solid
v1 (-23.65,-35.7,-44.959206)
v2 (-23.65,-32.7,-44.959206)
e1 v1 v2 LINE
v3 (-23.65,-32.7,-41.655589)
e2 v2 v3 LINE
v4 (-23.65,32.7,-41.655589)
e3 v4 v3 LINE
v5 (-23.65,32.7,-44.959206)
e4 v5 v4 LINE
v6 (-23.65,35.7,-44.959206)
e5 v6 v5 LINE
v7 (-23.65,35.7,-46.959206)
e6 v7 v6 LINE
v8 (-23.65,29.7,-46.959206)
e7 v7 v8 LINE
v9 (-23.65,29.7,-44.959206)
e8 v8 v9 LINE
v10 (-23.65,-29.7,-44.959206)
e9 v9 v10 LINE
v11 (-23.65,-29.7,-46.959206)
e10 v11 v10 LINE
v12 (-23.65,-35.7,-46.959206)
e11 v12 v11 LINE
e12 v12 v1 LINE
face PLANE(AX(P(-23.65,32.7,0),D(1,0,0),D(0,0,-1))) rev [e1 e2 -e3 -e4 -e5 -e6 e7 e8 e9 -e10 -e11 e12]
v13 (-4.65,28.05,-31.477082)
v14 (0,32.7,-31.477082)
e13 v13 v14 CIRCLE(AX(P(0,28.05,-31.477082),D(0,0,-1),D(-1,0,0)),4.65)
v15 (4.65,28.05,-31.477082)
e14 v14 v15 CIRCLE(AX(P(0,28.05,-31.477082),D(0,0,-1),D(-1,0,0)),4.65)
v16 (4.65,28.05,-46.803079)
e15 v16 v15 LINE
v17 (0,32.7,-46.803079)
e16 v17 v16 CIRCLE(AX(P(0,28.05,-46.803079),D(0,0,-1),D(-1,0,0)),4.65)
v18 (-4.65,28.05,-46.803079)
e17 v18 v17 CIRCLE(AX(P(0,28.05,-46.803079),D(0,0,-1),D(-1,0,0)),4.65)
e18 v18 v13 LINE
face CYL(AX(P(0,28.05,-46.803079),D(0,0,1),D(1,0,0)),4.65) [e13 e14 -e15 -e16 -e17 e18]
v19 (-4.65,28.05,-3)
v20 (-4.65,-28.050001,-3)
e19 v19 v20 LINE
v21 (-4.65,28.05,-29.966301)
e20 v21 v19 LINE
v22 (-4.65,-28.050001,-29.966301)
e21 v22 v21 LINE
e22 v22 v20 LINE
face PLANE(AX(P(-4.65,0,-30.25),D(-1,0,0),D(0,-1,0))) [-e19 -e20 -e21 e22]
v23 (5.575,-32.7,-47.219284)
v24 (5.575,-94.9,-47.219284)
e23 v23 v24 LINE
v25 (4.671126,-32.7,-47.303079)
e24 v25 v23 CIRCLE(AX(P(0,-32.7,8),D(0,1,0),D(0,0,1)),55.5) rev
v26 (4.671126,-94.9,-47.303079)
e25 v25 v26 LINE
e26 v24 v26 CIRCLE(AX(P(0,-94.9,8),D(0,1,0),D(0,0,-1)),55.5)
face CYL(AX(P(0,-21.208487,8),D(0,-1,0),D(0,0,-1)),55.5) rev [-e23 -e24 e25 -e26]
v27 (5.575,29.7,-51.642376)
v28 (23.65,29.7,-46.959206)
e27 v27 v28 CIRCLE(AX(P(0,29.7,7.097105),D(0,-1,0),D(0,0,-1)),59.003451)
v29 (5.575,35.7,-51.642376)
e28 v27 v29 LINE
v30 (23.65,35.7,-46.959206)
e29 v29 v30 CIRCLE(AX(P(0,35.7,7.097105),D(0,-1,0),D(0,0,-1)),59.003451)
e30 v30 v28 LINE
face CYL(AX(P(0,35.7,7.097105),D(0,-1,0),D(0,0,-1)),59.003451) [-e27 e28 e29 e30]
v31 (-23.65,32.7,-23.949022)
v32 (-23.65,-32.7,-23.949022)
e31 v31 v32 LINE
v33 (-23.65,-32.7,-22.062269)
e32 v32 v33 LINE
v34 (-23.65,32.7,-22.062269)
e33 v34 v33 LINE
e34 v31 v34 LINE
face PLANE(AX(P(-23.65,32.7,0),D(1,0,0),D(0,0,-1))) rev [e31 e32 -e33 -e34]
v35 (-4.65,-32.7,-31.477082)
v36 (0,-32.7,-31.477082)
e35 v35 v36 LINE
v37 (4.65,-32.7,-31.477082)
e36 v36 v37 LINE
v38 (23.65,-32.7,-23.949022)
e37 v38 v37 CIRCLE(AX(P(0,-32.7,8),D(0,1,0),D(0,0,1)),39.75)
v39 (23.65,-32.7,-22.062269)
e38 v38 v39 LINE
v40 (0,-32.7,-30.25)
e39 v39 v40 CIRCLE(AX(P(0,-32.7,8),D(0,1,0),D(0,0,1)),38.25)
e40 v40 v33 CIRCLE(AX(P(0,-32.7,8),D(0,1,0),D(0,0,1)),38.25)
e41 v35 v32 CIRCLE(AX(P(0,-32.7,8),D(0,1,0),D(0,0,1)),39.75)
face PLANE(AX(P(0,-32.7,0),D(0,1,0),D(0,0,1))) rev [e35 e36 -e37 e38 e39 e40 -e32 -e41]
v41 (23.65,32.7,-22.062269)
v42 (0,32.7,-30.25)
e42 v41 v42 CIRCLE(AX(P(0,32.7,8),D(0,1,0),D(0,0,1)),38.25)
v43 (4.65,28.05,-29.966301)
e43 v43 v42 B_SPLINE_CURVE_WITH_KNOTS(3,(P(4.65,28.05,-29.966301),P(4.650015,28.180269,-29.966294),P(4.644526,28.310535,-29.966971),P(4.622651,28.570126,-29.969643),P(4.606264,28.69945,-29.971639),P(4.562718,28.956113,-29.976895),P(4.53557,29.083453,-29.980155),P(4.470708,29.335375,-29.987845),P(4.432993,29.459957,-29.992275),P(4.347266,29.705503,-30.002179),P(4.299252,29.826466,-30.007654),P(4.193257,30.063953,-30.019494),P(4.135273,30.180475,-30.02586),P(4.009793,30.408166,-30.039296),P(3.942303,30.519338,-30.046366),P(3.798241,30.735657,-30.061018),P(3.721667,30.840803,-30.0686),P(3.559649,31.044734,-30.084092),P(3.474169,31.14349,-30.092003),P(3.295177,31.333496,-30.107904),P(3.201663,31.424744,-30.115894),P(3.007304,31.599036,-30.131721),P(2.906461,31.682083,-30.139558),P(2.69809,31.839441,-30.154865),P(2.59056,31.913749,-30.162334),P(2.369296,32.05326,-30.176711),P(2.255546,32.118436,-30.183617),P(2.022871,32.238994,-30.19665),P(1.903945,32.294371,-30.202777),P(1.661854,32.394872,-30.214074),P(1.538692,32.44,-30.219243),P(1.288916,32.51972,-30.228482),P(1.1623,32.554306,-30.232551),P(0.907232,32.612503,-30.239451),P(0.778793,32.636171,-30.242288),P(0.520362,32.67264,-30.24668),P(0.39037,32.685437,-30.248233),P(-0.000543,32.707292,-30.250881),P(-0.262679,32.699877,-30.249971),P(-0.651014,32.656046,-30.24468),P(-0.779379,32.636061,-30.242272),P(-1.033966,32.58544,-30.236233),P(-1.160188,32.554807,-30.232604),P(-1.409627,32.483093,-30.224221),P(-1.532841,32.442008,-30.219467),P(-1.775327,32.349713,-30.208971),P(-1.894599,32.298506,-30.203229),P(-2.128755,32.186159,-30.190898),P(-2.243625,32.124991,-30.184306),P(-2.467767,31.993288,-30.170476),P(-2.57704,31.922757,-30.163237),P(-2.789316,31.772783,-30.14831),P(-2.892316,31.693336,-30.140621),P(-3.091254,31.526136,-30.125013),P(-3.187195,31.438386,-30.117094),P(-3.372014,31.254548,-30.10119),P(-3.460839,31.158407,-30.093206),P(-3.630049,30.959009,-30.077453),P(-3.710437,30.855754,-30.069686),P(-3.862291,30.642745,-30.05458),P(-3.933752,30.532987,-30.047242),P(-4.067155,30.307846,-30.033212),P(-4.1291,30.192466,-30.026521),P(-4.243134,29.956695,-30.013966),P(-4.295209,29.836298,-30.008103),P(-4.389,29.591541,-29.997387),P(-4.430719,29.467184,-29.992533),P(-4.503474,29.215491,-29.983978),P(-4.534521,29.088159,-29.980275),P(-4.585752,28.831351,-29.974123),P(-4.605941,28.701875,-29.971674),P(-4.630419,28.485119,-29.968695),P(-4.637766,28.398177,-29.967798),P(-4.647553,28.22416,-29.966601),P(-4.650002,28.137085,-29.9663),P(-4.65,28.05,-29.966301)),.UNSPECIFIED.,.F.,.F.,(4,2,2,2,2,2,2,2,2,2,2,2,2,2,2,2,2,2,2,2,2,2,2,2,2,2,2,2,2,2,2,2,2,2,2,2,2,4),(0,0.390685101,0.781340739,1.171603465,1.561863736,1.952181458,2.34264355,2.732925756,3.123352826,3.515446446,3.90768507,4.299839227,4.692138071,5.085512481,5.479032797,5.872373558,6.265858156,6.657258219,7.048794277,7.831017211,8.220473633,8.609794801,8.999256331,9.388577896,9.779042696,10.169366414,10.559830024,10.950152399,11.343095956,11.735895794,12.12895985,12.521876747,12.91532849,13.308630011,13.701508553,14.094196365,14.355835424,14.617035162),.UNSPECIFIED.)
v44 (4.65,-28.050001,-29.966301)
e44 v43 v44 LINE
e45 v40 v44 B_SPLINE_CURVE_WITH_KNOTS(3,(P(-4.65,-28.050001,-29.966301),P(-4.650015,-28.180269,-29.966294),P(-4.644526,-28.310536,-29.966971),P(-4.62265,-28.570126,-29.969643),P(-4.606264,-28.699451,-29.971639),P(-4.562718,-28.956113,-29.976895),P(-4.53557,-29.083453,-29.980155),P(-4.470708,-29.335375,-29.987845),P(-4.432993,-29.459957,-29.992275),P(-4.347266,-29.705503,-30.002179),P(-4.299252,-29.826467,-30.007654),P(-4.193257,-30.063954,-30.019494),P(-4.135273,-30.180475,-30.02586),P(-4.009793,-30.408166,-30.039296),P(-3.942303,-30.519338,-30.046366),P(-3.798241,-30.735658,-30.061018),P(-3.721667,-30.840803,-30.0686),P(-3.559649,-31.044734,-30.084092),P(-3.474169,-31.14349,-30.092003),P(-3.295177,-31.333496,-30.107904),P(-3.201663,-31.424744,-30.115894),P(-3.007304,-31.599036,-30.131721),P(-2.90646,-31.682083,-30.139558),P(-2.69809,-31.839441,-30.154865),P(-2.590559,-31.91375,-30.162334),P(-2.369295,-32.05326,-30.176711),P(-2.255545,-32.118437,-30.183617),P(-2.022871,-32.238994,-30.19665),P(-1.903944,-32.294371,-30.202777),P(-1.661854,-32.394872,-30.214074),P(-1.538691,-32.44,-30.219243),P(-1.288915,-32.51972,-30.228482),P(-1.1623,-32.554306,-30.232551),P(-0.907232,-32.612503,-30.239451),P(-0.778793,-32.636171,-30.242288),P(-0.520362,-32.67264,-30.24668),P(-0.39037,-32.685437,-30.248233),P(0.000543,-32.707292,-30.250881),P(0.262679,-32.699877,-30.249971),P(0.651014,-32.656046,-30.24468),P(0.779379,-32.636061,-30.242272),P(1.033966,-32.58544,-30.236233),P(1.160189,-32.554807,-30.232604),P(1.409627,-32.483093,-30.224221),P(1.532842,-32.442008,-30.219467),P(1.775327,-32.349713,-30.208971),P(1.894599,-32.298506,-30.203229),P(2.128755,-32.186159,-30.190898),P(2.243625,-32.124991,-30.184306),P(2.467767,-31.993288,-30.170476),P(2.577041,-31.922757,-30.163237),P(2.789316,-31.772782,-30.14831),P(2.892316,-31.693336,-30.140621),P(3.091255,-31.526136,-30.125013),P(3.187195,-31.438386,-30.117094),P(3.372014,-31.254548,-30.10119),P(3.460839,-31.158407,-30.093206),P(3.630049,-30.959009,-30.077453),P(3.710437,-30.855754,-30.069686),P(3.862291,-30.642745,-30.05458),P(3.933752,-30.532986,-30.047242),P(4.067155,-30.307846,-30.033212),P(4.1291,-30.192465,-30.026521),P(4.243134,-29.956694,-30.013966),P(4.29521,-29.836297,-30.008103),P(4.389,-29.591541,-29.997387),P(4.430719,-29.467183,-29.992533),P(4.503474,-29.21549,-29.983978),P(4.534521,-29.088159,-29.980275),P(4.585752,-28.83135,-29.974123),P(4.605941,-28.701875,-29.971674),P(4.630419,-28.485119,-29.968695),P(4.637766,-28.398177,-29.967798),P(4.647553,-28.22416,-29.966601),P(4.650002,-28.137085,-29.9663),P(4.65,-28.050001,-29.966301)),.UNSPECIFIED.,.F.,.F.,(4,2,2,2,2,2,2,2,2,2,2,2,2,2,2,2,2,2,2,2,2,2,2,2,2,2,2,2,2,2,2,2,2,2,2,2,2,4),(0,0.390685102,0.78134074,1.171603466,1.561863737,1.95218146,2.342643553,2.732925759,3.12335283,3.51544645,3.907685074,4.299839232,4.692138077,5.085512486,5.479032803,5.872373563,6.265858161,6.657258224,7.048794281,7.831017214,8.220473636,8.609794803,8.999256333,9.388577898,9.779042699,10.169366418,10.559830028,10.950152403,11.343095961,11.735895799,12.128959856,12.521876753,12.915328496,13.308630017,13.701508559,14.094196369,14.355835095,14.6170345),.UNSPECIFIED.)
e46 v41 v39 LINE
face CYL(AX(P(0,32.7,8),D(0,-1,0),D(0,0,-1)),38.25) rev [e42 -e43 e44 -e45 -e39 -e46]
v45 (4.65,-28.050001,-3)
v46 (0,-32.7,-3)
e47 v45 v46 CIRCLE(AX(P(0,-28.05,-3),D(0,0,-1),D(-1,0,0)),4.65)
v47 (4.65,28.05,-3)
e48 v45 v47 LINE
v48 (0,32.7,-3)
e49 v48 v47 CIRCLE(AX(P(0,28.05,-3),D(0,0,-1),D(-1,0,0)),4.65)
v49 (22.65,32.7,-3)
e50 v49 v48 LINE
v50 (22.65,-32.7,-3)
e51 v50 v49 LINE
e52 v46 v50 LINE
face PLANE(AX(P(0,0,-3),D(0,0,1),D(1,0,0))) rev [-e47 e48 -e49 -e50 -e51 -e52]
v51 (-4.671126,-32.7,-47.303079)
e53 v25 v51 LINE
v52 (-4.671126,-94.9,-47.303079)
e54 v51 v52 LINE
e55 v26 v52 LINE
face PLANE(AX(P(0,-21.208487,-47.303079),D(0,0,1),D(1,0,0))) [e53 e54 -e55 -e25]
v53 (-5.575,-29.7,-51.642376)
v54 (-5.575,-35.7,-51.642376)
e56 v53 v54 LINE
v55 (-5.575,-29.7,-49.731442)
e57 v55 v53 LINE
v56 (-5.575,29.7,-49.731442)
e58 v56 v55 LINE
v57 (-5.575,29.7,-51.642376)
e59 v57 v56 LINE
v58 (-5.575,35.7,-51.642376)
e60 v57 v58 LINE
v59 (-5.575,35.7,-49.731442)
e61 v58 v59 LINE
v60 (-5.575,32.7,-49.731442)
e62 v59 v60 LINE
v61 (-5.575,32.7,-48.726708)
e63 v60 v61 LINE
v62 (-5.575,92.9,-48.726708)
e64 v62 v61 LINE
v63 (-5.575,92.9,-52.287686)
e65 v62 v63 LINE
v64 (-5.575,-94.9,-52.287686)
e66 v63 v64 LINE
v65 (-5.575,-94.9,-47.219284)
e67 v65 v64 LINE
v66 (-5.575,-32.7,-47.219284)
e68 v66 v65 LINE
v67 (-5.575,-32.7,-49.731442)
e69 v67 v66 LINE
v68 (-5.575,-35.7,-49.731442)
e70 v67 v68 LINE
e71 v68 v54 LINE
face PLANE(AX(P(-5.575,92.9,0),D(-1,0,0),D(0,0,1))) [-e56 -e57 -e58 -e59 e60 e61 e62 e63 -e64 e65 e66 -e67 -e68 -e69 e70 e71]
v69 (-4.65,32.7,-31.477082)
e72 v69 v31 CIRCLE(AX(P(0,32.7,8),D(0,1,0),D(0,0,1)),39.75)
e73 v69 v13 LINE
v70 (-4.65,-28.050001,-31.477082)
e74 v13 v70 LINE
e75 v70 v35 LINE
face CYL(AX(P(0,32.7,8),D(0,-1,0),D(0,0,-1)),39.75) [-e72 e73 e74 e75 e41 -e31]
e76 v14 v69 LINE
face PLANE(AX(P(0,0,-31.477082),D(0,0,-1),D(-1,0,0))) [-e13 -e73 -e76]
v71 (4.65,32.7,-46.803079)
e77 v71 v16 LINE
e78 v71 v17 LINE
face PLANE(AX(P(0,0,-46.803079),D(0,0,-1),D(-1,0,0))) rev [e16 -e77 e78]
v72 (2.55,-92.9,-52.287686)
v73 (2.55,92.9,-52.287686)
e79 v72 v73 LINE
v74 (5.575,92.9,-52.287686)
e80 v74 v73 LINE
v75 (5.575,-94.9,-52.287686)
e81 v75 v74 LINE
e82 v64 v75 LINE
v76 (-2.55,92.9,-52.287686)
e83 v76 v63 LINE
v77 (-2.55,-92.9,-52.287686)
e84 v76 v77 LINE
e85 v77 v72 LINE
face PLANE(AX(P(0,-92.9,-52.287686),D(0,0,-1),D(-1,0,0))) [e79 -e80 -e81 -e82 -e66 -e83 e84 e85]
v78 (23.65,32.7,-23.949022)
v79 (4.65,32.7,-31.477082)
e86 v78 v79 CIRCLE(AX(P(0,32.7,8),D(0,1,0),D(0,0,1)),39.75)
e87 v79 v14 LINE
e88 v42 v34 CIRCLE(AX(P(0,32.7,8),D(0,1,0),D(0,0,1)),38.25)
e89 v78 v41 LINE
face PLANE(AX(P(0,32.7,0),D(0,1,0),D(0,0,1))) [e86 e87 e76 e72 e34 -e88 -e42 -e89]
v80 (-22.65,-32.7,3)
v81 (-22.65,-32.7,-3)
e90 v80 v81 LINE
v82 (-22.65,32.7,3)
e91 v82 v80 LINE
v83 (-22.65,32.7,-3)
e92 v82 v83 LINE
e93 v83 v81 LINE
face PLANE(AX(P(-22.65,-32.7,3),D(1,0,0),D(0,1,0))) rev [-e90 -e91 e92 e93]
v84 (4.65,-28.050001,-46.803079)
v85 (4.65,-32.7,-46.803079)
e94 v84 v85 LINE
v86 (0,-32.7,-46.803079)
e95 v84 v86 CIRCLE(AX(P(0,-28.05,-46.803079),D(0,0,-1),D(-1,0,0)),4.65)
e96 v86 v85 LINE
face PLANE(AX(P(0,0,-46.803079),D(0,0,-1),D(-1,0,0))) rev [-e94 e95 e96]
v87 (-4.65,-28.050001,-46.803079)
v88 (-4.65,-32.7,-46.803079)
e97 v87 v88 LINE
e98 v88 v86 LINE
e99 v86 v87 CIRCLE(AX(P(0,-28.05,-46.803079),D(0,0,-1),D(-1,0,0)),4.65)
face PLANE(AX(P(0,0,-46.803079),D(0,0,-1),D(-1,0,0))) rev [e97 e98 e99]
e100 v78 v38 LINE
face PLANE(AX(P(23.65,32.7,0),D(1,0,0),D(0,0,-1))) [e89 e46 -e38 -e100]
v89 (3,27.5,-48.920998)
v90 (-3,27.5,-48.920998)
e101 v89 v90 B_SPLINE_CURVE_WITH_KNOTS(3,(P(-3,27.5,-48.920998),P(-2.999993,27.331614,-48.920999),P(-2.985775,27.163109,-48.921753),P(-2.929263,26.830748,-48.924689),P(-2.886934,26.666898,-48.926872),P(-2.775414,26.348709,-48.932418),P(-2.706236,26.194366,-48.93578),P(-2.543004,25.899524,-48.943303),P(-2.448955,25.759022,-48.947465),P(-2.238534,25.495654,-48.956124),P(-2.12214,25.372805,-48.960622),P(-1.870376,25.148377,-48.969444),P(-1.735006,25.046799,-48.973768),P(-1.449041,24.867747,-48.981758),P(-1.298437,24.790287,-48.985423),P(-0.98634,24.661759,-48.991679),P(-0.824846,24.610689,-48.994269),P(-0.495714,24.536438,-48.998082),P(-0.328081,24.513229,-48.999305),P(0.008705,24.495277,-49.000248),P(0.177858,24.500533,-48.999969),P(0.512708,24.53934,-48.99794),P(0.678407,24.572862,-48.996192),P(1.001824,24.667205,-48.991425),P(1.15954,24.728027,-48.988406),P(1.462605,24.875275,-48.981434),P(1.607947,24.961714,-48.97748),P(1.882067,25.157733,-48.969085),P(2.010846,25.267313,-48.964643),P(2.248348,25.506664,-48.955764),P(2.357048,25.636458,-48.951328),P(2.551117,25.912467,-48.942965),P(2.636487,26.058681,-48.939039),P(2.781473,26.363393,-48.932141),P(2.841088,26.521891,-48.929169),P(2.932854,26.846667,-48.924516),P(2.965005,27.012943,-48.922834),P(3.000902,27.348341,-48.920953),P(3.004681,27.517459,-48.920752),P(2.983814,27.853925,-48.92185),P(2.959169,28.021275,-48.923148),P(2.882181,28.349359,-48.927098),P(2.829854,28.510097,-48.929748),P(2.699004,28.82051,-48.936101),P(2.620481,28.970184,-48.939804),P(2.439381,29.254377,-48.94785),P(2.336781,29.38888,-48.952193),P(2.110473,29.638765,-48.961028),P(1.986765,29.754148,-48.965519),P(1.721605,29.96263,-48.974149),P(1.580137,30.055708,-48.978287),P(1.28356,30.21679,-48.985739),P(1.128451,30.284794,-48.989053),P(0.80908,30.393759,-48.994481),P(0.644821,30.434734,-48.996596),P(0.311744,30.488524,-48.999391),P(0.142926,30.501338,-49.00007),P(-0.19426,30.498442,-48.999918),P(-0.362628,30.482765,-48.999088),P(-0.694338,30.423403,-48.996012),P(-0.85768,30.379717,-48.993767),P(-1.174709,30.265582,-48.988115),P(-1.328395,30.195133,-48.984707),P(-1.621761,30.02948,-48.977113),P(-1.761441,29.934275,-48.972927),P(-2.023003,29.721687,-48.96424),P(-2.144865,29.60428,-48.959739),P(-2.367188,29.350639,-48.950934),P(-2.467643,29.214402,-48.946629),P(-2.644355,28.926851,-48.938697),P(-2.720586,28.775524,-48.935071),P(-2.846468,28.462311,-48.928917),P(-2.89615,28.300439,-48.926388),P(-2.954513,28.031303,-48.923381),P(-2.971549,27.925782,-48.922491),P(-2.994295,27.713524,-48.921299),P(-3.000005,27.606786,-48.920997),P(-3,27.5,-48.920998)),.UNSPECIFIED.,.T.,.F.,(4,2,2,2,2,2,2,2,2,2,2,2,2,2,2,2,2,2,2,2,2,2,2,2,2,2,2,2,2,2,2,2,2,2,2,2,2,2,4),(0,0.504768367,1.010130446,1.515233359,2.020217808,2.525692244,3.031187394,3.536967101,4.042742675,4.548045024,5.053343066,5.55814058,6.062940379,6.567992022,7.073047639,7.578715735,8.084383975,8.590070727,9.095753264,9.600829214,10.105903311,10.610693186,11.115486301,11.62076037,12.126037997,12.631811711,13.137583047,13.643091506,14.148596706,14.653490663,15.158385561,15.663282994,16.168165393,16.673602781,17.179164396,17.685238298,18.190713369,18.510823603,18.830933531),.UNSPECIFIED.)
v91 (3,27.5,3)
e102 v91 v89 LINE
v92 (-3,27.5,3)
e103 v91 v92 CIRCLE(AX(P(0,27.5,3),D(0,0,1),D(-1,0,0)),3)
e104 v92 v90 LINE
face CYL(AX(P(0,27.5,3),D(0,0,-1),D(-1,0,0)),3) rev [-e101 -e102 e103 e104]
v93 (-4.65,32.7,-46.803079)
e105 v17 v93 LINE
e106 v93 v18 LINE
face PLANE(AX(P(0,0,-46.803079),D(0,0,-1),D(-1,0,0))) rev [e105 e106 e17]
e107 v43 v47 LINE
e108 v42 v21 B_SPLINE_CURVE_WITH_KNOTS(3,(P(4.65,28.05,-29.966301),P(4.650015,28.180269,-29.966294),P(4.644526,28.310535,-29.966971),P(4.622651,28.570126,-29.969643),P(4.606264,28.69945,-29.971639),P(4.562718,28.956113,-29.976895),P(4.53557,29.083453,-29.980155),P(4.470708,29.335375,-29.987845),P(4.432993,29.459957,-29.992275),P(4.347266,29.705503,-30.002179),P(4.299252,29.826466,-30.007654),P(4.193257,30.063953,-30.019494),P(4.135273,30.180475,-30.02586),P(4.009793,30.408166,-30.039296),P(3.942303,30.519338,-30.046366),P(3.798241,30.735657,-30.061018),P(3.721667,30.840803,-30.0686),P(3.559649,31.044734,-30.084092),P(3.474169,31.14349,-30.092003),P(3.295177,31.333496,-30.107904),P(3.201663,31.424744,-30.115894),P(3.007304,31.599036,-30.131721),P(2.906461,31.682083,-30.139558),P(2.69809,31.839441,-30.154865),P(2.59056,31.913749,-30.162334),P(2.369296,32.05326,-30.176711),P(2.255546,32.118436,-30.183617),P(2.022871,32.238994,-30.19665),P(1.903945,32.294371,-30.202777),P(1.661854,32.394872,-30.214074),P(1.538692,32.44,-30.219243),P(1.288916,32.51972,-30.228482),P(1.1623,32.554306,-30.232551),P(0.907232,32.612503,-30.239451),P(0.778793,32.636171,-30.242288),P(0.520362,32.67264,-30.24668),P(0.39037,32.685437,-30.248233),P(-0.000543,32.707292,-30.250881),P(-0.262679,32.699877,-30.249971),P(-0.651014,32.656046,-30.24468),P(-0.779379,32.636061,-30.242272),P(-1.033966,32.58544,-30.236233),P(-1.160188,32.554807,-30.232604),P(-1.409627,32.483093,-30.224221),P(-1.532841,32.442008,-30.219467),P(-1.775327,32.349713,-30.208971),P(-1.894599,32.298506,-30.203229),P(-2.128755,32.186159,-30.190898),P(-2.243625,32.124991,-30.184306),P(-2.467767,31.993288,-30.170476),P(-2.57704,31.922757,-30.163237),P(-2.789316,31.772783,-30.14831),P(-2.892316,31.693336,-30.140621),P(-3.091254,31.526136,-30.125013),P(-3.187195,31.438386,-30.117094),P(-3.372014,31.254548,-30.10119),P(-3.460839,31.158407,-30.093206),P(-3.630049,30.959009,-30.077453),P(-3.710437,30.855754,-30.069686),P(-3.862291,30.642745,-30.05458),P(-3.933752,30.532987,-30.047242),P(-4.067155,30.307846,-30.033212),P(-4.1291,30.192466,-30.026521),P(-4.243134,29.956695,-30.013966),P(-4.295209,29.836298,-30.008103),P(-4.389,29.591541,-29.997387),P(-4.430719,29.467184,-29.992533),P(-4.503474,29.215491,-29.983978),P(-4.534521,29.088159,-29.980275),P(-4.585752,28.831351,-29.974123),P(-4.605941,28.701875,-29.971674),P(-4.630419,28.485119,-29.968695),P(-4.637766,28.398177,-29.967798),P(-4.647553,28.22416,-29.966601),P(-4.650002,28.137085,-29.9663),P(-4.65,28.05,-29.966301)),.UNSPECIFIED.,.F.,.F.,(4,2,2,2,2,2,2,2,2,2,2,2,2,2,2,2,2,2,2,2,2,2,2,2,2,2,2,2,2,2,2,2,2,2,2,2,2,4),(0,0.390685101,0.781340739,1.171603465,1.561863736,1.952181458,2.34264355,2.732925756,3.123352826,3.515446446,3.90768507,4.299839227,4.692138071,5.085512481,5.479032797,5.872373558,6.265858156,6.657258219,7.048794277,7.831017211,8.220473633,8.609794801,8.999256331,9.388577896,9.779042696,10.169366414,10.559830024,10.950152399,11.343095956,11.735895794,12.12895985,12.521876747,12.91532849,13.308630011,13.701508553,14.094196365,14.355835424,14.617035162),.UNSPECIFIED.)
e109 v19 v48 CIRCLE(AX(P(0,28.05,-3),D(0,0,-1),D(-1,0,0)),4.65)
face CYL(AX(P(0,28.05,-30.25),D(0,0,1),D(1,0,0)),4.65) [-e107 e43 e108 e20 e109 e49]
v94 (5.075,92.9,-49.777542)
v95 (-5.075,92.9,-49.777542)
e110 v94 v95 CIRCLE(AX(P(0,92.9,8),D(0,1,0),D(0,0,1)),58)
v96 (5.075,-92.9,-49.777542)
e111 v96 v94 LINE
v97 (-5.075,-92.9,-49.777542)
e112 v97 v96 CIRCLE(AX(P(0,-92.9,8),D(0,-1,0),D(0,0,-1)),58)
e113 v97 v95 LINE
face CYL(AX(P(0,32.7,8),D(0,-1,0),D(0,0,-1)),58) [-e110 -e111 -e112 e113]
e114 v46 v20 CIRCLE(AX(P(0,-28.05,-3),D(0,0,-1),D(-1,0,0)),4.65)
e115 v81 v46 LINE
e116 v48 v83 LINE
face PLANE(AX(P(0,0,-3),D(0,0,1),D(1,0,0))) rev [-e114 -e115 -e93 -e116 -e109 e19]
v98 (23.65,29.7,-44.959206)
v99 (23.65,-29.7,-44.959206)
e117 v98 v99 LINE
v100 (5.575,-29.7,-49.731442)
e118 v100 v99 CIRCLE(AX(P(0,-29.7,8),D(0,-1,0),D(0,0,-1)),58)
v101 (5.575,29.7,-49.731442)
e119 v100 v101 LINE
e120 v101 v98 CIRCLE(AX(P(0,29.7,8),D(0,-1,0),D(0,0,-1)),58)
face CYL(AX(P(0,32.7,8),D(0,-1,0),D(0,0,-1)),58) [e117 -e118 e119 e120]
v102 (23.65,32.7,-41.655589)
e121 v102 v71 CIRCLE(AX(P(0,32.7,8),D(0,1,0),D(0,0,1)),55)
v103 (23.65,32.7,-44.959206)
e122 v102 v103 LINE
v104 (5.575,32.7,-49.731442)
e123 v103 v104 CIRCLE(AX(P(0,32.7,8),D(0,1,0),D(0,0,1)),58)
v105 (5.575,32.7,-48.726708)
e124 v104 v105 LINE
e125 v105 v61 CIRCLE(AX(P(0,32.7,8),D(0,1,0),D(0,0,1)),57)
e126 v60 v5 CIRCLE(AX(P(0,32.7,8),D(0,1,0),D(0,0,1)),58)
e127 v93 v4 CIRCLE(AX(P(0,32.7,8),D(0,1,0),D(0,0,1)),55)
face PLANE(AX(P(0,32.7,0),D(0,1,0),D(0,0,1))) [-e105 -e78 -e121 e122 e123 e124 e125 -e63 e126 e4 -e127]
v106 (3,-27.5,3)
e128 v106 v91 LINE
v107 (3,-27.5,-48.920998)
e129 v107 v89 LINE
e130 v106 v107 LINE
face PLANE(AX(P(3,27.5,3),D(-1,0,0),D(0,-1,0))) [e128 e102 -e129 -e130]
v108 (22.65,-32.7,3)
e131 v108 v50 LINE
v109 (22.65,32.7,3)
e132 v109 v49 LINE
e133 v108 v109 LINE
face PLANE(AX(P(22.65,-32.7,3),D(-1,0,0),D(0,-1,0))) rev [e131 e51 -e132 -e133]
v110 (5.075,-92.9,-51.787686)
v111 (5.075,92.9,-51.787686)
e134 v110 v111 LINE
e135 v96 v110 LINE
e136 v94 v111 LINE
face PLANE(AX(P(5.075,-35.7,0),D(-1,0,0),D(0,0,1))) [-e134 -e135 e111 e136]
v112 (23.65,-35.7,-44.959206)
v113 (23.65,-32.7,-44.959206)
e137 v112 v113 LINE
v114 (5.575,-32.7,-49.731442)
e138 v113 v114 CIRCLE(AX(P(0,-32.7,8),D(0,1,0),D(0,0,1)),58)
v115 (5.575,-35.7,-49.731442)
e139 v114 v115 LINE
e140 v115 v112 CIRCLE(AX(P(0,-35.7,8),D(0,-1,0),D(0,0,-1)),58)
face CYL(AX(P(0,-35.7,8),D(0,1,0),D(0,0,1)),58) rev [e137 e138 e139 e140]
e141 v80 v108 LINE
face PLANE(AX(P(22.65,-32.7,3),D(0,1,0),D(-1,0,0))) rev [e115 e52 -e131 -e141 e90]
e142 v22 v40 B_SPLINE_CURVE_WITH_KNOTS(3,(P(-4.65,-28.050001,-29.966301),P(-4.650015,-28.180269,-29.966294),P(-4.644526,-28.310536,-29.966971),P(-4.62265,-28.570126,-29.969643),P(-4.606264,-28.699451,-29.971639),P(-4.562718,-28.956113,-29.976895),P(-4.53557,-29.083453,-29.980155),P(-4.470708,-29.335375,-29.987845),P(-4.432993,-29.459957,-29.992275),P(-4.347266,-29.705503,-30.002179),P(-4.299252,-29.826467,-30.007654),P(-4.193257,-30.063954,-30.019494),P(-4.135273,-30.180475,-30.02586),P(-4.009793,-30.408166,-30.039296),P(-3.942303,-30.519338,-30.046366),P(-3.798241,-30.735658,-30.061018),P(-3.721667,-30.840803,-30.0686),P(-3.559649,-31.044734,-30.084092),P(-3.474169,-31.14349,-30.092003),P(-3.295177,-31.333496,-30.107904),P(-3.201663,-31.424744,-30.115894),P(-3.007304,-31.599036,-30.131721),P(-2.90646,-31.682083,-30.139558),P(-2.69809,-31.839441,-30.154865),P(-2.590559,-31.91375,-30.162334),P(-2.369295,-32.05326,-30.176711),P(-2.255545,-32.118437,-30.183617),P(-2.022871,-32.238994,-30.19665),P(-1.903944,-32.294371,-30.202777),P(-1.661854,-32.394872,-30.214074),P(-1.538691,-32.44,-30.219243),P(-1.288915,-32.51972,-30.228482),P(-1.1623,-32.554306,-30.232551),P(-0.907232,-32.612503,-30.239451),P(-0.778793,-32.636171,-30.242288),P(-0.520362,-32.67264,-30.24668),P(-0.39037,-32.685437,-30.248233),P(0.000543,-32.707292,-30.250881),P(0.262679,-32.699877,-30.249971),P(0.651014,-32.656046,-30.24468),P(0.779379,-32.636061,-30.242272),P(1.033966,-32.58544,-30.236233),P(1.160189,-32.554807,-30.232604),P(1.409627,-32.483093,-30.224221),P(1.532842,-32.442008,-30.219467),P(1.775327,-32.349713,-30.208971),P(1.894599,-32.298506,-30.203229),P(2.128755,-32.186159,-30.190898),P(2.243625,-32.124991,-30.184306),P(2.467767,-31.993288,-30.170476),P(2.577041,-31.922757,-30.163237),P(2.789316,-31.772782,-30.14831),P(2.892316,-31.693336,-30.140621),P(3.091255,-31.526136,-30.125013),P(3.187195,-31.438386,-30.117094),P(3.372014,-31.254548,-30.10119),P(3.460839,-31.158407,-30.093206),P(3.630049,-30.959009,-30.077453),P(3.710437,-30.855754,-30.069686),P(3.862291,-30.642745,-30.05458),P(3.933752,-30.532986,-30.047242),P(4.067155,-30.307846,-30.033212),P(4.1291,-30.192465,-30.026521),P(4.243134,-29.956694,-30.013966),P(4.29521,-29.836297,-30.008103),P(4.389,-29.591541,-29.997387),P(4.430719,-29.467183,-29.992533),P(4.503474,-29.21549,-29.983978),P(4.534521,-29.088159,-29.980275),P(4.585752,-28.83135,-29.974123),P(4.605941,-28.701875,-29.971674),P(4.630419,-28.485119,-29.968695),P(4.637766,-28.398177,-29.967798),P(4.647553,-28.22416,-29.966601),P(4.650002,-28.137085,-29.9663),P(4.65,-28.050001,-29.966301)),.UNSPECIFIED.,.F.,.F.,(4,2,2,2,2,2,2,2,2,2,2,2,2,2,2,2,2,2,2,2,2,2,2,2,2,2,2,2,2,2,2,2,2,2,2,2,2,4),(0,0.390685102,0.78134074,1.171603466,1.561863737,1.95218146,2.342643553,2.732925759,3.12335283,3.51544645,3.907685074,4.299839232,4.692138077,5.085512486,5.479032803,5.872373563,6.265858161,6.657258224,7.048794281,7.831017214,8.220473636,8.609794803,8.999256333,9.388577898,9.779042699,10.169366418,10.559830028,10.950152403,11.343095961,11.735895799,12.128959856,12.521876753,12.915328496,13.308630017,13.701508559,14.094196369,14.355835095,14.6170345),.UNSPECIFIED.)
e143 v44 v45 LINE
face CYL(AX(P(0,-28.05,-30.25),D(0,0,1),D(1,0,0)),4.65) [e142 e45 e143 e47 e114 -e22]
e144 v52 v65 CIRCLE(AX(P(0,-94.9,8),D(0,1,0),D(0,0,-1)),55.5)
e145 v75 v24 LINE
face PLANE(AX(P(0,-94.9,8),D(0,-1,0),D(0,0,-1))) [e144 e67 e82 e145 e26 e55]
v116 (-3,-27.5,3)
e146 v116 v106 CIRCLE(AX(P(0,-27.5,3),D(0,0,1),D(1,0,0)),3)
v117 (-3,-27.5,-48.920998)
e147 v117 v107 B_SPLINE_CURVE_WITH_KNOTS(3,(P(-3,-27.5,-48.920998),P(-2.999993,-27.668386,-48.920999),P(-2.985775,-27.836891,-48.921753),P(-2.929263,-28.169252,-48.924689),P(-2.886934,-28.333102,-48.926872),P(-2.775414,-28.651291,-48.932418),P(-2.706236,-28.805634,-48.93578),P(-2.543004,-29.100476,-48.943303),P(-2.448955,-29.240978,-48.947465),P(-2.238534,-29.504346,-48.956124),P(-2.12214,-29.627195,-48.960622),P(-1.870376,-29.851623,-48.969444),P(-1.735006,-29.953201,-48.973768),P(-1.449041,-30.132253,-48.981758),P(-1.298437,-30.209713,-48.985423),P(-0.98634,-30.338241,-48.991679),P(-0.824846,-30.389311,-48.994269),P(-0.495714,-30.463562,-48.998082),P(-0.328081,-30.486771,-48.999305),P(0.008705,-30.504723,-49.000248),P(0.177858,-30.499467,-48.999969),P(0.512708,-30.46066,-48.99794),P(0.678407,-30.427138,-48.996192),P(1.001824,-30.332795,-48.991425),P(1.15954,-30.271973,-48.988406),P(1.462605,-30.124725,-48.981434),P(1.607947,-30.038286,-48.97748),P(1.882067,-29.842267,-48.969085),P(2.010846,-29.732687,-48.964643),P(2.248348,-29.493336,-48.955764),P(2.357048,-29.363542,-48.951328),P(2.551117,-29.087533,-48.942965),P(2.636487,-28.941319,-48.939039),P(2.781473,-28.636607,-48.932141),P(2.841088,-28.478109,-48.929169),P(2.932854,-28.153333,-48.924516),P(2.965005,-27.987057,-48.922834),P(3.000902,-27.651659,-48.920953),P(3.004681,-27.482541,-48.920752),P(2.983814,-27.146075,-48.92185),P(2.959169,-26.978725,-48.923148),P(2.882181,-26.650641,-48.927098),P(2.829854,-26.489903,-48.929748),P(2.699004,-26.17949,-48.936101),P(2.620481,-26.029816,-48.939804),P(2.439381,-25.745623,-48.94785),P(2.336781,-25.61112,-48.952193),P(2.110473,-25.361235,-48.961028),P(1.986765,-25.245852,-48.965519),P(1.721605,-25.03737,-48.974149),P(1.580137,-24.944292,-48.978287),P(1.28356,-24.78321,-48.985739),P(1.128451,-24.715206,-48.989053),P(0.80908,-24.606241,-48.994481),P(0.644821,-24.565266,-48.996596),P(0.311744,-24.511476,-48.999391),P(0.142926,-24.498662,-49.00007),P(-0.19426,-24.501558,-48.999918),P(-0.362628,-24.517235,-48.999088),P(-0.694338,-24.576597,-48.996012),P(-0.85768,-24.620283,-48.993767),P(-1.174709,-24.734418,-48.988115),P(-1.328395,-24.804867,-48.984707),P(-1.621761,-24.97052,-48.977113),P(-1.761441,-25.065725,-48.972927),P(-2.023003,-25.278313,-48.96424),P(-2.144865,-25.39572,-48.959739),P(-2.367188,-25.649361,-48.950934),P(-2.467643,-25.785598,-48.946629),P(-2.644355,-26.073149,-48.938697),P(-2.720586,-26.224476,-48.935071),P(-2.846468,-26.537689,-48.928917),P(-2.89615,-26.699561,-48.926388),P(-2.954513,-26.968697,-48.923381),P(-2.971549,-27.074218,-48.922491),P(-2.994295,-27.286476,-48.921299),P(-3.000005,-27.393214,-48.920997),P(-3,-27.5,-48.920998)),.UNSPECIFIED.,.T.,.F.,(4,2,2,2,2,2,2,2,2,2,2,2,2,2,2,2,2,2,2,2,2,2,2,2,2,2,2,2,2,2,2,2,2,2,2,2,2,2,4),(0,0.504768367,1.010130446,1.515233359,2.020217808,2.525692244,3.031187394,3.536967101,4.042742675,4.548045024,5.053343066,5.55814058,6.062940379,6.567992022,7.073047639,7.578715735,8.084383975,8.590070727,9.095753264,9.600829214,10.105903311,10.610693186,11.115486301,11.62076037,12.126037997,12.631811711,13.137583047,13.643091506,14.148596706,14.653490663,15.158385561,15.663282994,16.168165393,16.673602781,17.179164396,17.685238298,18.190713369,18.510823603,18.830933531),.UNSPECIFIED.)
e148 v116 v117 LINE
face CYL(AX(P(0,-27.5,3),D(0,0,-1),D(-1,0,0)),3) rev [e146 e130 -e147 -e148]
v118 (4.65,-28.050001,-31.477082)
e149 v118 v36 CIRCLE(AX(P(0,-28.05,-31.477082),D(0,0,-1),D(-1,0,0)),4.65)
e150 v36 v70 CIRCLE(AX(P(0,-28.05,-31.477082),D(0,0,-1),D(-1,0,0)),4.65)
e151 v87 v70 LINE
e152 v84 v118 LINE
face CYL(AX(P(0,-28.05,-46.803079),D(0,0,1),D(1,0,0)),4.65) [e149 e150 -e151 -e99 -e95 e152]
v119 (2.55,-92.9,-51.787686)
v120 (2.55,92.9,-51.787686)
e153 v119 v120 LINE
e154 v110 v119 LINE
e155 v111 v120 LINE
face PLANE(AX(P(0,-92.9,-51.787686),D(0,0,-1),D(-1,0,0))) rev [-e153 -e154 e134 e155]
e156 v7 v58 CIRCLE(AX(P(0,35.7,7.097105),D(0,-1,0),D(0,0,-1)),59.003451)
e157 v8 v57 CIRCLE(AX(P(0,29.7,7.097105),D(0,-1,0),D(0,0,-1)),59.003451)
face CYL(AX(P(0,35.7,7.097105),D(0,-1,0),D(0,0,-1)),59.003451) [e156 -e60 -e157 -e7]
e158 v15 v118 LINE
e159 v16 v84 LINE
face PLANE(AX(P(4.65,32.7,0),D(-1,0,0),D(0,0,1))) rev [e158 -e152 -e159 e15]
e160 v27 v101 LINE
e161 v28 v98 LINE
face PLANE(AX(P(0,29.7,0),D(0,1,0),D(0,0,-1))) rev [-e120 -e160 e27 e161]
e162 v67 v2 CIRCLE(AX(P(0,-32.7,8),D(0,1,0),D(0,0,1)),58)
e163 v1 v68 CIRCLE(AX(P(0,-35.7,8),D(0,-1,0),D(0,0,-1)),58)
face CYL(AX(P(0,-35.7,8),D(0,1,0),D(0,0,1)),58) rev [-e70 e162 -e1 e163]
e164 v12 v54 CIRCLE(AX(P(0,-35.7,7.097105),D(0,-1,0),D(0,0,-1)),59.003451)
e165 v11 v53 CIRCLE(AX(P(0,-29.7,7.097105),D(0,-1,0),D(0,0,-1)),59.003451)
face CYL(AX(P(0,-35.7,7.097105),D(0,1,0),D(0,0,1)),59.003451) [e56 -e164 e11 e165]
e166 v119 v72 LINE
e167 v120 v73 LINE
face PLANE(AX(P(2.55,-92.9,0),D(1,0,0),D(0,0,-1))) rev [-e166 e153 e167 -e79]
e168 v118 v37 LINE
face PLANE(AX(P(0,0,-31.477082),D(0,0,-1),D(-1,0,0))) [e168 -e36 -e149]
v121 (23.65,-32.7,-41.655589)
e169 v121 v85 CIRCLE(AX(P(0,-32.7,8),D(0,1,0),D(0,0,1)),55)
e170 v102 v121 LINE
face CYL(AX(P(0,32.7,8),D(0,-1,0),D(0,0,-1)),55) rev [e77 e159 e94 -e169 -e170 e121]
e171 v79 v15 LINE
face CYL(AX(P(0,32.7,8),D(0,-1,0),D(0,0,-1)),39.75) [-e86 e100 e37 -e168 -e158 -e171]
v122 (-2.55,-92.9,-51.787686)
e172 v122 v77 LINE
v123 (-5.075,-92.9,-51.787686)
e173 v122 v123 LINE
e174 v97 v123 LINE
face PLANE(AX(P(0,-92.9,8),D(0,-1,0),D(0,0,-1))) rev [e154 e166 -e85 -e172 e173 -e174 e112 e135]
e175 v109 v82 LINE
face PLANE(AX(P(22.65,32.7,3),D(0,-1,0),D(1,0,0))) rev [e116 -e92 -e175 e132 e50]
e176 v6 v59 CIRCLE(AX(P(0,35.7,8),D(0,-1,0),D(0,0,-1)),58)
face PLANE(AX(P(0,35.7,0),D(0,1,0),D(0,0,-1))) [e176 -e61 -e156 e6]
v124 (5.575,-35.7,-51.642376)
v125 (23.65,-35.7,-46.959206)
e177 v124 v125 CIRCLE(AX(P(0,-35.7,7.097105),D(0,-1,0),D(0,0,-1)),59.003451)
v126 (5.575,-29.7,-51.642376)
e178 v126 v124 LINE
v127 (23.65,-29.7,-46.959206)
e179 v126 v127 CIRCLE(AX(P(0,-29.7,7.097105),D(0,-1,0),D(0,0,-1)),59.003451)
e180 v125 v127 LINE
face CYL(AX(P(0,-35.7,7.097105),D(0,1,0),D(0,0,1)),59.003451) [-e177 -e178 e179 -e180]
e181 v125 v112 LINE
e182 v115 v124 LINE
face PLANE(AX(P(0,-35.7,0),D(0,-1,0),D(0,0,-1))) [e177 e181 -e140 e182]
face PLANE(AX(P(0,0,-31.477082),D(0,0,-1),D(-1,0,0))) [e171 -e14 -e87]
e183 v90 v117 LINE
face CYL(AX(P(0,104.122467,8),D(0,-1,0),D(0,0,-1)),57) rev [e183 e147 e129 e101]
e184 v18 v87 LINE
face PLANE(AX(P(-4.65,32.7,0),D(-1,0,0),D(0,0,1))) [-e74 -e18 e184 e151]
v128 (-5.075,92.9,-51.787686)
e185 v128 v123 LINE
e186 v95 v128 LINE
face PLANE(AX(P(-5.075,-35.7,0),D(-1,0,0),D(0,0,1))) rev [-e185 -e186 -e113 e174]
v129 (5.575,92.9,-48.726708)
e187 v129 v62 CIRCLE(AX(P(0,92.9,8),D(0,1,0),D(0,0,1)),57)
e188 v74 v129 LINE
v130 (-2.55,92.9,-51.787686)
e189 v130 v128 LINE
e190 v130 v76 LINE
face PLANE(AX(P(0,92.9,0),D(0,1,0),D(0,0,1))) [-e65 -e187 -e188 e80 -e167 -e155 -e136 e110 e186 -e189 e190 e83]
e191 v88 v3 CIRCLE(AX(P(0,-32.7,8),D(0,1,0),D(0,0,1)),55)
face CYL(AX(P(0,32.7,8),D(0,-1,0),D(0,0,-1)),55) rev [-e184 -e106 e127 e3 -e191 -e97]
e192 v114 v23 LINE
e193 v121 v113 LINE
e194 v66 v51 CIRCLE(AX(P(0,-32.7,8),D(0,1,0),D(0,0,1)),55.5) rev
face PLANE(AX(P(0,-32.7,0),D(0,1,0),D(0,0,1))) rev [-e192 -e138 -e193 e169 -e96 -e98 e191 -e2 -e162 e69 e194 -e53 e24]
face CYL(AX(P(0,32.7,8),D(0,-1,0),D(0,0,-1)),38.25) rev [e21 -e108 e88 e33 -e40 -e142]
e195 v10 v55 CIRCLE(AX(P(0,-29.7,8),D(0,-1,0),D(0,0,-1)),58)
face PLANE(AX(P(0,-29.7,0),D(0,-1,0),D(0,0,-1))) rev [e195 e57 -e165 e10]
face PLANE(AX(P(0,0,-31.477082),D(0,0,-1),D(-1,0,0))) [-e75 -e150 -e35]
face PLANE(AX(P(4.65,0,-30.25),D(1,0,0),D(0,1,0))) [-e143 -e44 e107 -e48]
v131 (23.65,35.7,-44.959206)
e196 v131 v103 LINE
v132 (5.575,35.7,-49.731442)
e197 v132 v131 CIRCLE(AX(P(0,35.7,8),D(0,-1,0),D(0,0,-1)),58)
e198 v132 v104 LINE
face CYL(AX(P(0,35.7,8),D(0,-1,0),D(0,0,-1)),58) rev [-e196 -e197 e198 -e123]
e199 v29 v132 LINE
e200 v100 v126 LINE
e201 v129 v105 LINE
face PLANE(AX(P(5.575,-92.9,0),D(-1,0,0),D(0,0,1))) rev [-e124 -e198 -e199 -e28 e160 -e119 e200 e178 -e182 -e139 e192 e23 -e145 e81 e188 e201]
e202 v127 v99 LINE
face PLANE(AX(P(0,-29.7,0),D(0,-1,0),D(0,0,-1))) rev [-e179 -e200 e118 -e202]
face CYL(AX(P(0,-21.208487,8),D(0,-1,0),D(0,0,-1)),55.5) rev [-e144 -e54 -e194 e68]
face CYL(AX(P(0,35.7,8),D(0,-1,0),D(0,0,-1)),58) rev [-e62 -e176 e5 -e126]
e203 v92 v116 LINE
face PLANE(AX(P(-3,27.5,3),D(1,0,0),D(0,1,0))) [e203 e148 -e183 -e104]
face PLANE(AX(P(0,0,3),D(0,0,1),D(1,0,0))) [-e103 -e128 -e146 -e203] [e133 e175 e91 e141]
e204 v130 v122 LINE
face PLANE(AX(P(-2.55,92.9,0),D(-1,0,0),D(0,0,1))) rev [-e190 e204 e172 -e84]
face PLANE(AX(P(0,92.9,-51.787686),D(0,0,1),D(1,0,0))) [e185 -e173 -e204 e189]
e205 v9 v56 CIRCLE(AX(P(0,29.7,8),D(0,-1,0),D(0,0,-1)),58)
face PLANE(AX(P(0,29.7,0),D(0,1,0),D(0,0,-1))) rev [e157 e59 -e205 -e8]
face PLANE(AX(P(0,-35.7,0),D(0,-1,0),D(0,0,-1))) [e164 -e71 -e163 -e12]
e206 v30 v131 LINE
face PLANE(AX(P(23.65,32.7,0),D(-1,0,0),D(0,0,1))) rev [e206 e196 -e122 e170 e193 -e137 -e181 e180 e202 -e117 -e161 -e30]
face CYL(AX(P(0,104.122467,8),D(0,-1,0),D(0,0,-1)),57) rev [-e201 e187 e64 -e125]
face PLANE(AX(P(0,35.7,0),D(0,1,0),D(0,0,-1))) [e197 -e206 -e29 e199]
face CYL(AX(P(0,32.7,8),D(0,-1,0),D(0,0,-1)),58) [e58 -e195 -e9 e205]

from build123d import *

# Parameters (mm, degrees)
SKETCH1_W                = 45.3
SKETCH1_H                = 65.4
BOSS_EXTRUDE1_DEPTH      = 3
BOSS_EXTRUDE2_DEPTH      = 27.25
BOSS_EXTRUDE3_START      = -32.7
BOSS_EXTRUDE3_DEPTH      = 65.4
CUT_EXTRUDE1_DEPTH       = 65.254280101
CUT_EXTRUDE1_DEPTH_BACK  = 65.254280101
CUT_EXTRUDE3_DEPTH       = 15.325997
BOSS_EXTRUDE4_START      = 6
BOSS_EXTRUDE4_DEPTH      = 6
CUT_EXTRUDE4_DEPTH       = 92.386822264
BOSS_EXTRUDE5_DEPTH      = 92.9
BOSS_EXTRUDE5_DEPTH_BACK = 92.9
BOSS_EXTRUDE6_DEPTH      = 60.2
BOSS_EXTRUDE7_START      = 2
BOSS_EXTRUDE7_DEPTH      = 2
BOSS_EXTRUDE8_START      = -63.2
BOSS_EXTRUDE8_DEPTH      = 123.4


# Read off the part's stored shape, not the designer's step: Boss-Extrude3
with BuildPart() as part:
    # Sketch1 → Boss-Extrude1 (new, symmetric)
    with BuildSketch(Plane.XY):
        Rectangle(SKETCH1_W, SKETCH1_H)
        with BuildLine():
            Line((3, 27.5), (3, -27.5))
            ThreePointArc((3, -27.5), (0, -30.5), (-3, -27.5))
            Line((-3, -27.5), (-3, 27.5))
            ThreePointArc((-3, 27.5), (0, 30.5), (3, 27.5))
        make_face(mode=Mode.SUBTRACT)
    extrude(amount=BOSS_EXTRUDE1_DEPTH, both=True)

    # Sketch3 → Boss-Extrude2 (add)
    with BuildSketch(Plane(origin=(0, 0, -3), x_dir=(-1, 0, 0), z_dir=(0, 0, -1))):
        with BuildLine():
            Line((4.65, 28.050000345), (4.65, -28.050000676))
            ThreePointArc((4.65, -28.050000676), (0, -32.7), (-4.65, -28.050000677))
            Line((-4.65, -28.050000677), (-4.65, 28.050000345))
            ThreePointArc((-4.65, 28.050000345), (0, 32.7), (4.65, 28.050000345))
        make_face()
    extrude(amount=BOSS_EXTRUDE2_DEPTH)

    # Boss-Extrude3 outline → Boss-Extrude3 (add)
    with BuildSketch(Plane(origin=(0, 0, 0), x_dir=(1, 0, 0), z_dir=(0, 1, 0)).offset(BOSS_EXTRUDE3_START)):
        with BuildLine():
            Line((4.65, 31.477081959), (4.65, 46.803079293))
            ThreePointArc((4.65, 46.803079293), (14.382164808, 45.086281989), (23.65, 41.655588809))
            Line((23.65, 41.655588809), (23.65, 44.959205999))
            ThreePointArc((23.65, 44.959205999), (0, 50), (-23.65, 44.959205999))
            Line((-23.65, 44.959205999), (-23.65, 41.655588809))
            ThreePointArc((-23.65, 41.655588809), (-14.382164808, 45.086281989), (-4.65, 46.803079293))
            Line((-4.65, 46.803079293), (-4.65, 31.477081959))
            ThreePointArc((-4.65, 31.477081959), (-14.64207711, 28.955000716), (-23.65, 23.949021894))
            Line((-23.65, 23.949021894), (-23.65, 22.06226871))
            ThreePointArc((-23.65, 22.06226871), (-12.513607029, 28.145153743), (3e-09, 30.25))
            ThreePointArc((3e-09, 30.25), (12.513607029, 28.145153743), (23.65, 22.06226871))
            Line((23.65, 22.06226871), (23.65, 23.949021894))
            ThreePointArc((23.65, 23.949021894), (14.64207711, 28.955000716), (4.65, 31.477081959))
        make_face()
    extrude(amount=BOSS_EXTRUDE3_DEPTH)

    # Sketch5 → Cut-Extrude1 (cut, two sides: drawn at the far end of the back side and taken through both)
    with BuildSketch(Plane.XY.offset(-CUT_EXTRUDE1_DEPTH_BACK)):
        with BuildLine():
            Line((3, -27.5), (3, 27.5))
            ThreePointArc((3, 27.5), (0, 30.5), (-3, 27.5))
            Line((-3, 27.5), (-3, -27.5))
            ThreePointArc((-3, -27.5), (0, -30.5), (3, -27.5))
        make_face()
    extrude(amount=CUT_EXTRUDE1_DEPTH + CUT_EXTRUDE1_DEPTH_BACK, mode=Mode.SUBTRACT)

    # Sketch6 → Cut-Extrude3 (cut)
    with BuildSketch(Plane(origin=(0, 0, -31.477081959), x_dir=(-1, 0, 0), z_dir=(0, 0, -1))):
        with BuildLine():
            ThreePointArc((0, -32.7), (-3.288046293, -31.338046772), (-4.65, -28.050000677))
            Line((-4.65, -28.050000677), (-4.65, -32.7))
            Line((-4.65, -32.7), (0, -32.7))
        make_face()
        with BuildLine():
            ThreePointArc((4.65, -28.050000676), (3.288046294, -31.338046771), (0, -32.7))
            Line((0, -32.7), (4.65, -32.7))
            Line((4.65, -32.7), (4.65, -28.050000676))
        make_face()
        with BuildLine():
            Line((-4.65, 32.7), (-4.65, 28.050000345))
            ThreePointArc((-4.65, 28.050000345), (-3.288046411, 31.338046654), (0, 32.7))
            Line((0, 32.7), (-4.65, 32.7))
        make_face()
        with BuildLine():
            Line((4.65, 32.7), (0, 32.7))
            ThreePointArc((0, 32.7), (3.28804641, 31.338046655), (4.65, 28.050000345))
            Line((4.65, 28.050000345), (4.65, 32.7))
        make_face()
    extrude(amount=CUT_EXTRUDE3_DEPTH, mode=Mode.SUBTRACT)

    # Sketch8 → Boss-Extrude4 (add)
    with BuildSketch(Plane(origin=(0, -29.7, 0), x_dir=(-1, 0, 0), z_dir=(0, -1, 0)).offset(BOSS_EXTRUDE4_START)):
        with BuildLine():
            ThreePointArc((23.65, 44.959205999), (0, 50), (-23.65, 44.959205999))
            Line((-23.65, 44.959205999), (-23.65, 46.959205999))
            ThreePointArc((-23.65, 46.959205999), (0, 51.906346228), (23.65, 46.959205999))
            Line((23.65, 46.959205999), (23.65, 44.959205999))
        make_face()
    boss_extrude4 = extrude(amount=-BOSS_EXTRUDE4_DEPTH)

    # Mirror1: Boss-Extrude4 across plane
    add(boss_extrude4.mirror(Plane.ZX))

    # Sketch10 → Cut-Extrude4 (cut, through all)
    with BuildSketch(Plane(origin=(0, 35.7, 0), x_dir=(1, 0, 0), z_dir=(0, 1, 0))):
        with BuildLine():
            ThreePointArc((0, 51.906346228), (-2.389460165, 51.857943444), (-4.775, 51.712814503))
            Line((-4.775, 51.712814503), (-4.775, 49.803108697))
            ThreePointArc((-4.775, 49.803108697), (-2.389528781, 49.950756269), (0, 50))
            Line((0, 50), (0, 51.906346228))
        make_face()
        with BuildLine():
            ThreePointArc((4.775, 51.712814503), (2.389460165, 51.857943444), (0, 51.906346228))
            Line((0, 51.906346228), (0, 50))
            ThreePointArc((0, 50), (2.389528781, 49.950756269), (4.775, 49.803108697))
            Line((4.775, 49.803108697), (4.775, 51.712814503))
        make_face()
        with BuildLine():
            ThreePointArc((-4.775, 51.712814503), (-4.925016027, 51.700441497), (-5.075, 51.687685822))
            Line((-5.075, 51.687685822), (-5.075, 49.777542134))
            ThreePointArc((-5.075, 49.777542134), (-4.92501659, 49.790520084), (-4.775, 49.803108697))
            Line((-4.775, 49.803108697), (-4.775, 51.712814503))
        make_face()
        with BuildLine():
            ThreePointArc((5.075, 51.687685822), (4.925016027, 51.700441497), (4.775, 51.712814503))
            Line((4.775, 51.712814503), (4.775, 49.803108697))
            ThreePointArc((4.775, 49.803108697), (4.92501659, 49.790520084), (5.075, 49.777542134))
            Line((5.075, 49.777542134), (5.075, 51.687685822))
        make_face()
    extrude(amount=-CUT_EXTRUDE4_DEPTH, mode=Mode.SUBTRACT)

    # Sketch11 → Boss-Extrude5 (add, two sides: drawn at the far end of the back side and taken through both)
    with BuildSketch(Plane(origin=(0, 0, 0), x_dir=(1, 0, 0), z_dir=(0, 1, 0)).offset(-BOSS_EXTRUDE5_DEPTH_BACK)):
        with BuildLine():
            ThreePointArc((-5.575, 49.731441823), (-5.325049888, 49.755033059), (-5.075, 49.777542134))
            Line((-5.075, 49.777542134), (-5.075, 51.787685822))
            Line((-5.075, 51.787685822), (-2.55, 51.787685822))
            Line((-2.55, 51.787685822), (-2.55, 52.287685822))
            Line((-2.55, 52.287685822), (-5.575, 52.287685822))
            Line((-5.575, 52.287685822), (-5.575, 49.731441823))
        make_face()
        with BuildLine():
            ThreePointArc((5.075, 49.777542134), (5.325049888, 49.755033059), (5.575, 49.731441823))
            Line((5.575, 49.731441823), (5.575, 52.287685822))
            Line((5.575, 52.287685822), (2.55, 52.287685822))
            Line((2.55, 52.287685822), (2.55, 51.787685822))
            Line((2.55, 51.787685822), (5.075, 51.787685822))
            Line((5.075, 51.787685822), (5.075, 49.777542134))
        make_face()
    extrude(amount=BOSS_EXTRUDE5_DEPTH + BOSS_EXTRUDE5_DEPTH_BACK)

    # Sketch13 → Boss-Extrude6 (add)
    with BuildSketch(Plane(origin=(0, -92.9, 0), x_dir=(-1, 0, 0), z_dir=(0, -1, 0))):
        with BuildLine():
            ThreePointArc((-5.075, 49.777542134), (-5.325049888, 49.755033059), (-5.575, 49.731441823))
            Line((-5.575, 49.731441823), (-5.575, 47.219284448))
            ThreePointArc((-5.575, 47.219284448), (-5.123234459, 47.263029854), (-4.671126278, 47.303079293))
            Line((-4.671126278, 47.303079293), (0, 47.303079293))
            Line((0, 47.303079293), (4.671126278, 47.303079293))
            ThreePointArc((4.671126278, 47.303079293), (5.123234459, 47.263029854), (5.575, 47.219284448))
            Line((5.575, 47.219284448), (5.575, 49.731441823))
            ThreePointArc((5.575, 49.731441823), (5.325049888, 49.755033059), (5.075, 49.777542134))
            ThreePointArc((5.075, 49.777542134), (0, 50), (-5.075, 49.777542134))
        make_face()
    extrude(amount=-BOSS_EXTRUDE6_DEPTH)

    # Sketch14 → Boss-Extrude7 (add)
    with BuildSketch(Plane(origin=(0, -92.9, 0), x_dir=(-1, 0, 0), z_dir=(0, -1, 0)).offset(BOSS_EXTRUDE7_START)):
        with BuildLine():
            Line((-2.55, 52.287685822), (2.55, 52.287685822))
            Line((2.55, 52.287685822), (5.575, 52.287685822))
            Line((5.575, 52.287685822), (5.575, 47.219284448))
            ThreePointArc((5.575, 47.219284448), (5.123234459, 47.263029854), (4.671126278, 47.303079293))
            Line((4.671126278, 47.303079293), (-4.671126278, 47.303079293))
            ThreePointArc((-4.671126278, 47.303079293), (-5.123234459, 47.263029854), (-5.575, 47.219284448))
            Line((-5.575, 47.219284448), (-5.575, 52.287685822))
            Line((-5.575, 52.287685822), (-2.55, 52.287685822))
        make_face()
    extrude(amount=-BOSS_EXTRUDE7_DEPTH)

    # Sketch15 → Boss-Extrude8 (add)
    with BuildSketch(Plane(origin=(0, 32.7, 0), x_dir=(1, 0, 0), z_dir=(0, 1, 0)).offset(BOSS_EXTRUDE8_START)):
        with BuildLine():
            ThreePointArc((-5.075, 49.777542134), (-5.325049888, 49.755033059), (-5.575, 49.731441823))
            Line((-5.575, 49.731441823), (-5.575, 48.726707775))
            ThreePointArc((-5.575, 48.726707775), (0, 49), (5.575, 48.726707775))
            Line((5.575, 48.726707775), (5.575, 49.731441823))
            ThreePointArc((5.575, 49.731441823), (5.325049888, 49.755033059), (5.075, 49.777542134))
            ThreePointArc((5.075, 49.777542134), (0, 50), (-5.075, 49.777542134))
        make_face()
    boss_extrude8 = extrude(amount=BOSS_EXTRUDE8_DEPTH)

    # Mirror2: Boss-Extrude8 across plane
    add(boss_extrude8.mirror(Plane.ZX))


solid = part.part
